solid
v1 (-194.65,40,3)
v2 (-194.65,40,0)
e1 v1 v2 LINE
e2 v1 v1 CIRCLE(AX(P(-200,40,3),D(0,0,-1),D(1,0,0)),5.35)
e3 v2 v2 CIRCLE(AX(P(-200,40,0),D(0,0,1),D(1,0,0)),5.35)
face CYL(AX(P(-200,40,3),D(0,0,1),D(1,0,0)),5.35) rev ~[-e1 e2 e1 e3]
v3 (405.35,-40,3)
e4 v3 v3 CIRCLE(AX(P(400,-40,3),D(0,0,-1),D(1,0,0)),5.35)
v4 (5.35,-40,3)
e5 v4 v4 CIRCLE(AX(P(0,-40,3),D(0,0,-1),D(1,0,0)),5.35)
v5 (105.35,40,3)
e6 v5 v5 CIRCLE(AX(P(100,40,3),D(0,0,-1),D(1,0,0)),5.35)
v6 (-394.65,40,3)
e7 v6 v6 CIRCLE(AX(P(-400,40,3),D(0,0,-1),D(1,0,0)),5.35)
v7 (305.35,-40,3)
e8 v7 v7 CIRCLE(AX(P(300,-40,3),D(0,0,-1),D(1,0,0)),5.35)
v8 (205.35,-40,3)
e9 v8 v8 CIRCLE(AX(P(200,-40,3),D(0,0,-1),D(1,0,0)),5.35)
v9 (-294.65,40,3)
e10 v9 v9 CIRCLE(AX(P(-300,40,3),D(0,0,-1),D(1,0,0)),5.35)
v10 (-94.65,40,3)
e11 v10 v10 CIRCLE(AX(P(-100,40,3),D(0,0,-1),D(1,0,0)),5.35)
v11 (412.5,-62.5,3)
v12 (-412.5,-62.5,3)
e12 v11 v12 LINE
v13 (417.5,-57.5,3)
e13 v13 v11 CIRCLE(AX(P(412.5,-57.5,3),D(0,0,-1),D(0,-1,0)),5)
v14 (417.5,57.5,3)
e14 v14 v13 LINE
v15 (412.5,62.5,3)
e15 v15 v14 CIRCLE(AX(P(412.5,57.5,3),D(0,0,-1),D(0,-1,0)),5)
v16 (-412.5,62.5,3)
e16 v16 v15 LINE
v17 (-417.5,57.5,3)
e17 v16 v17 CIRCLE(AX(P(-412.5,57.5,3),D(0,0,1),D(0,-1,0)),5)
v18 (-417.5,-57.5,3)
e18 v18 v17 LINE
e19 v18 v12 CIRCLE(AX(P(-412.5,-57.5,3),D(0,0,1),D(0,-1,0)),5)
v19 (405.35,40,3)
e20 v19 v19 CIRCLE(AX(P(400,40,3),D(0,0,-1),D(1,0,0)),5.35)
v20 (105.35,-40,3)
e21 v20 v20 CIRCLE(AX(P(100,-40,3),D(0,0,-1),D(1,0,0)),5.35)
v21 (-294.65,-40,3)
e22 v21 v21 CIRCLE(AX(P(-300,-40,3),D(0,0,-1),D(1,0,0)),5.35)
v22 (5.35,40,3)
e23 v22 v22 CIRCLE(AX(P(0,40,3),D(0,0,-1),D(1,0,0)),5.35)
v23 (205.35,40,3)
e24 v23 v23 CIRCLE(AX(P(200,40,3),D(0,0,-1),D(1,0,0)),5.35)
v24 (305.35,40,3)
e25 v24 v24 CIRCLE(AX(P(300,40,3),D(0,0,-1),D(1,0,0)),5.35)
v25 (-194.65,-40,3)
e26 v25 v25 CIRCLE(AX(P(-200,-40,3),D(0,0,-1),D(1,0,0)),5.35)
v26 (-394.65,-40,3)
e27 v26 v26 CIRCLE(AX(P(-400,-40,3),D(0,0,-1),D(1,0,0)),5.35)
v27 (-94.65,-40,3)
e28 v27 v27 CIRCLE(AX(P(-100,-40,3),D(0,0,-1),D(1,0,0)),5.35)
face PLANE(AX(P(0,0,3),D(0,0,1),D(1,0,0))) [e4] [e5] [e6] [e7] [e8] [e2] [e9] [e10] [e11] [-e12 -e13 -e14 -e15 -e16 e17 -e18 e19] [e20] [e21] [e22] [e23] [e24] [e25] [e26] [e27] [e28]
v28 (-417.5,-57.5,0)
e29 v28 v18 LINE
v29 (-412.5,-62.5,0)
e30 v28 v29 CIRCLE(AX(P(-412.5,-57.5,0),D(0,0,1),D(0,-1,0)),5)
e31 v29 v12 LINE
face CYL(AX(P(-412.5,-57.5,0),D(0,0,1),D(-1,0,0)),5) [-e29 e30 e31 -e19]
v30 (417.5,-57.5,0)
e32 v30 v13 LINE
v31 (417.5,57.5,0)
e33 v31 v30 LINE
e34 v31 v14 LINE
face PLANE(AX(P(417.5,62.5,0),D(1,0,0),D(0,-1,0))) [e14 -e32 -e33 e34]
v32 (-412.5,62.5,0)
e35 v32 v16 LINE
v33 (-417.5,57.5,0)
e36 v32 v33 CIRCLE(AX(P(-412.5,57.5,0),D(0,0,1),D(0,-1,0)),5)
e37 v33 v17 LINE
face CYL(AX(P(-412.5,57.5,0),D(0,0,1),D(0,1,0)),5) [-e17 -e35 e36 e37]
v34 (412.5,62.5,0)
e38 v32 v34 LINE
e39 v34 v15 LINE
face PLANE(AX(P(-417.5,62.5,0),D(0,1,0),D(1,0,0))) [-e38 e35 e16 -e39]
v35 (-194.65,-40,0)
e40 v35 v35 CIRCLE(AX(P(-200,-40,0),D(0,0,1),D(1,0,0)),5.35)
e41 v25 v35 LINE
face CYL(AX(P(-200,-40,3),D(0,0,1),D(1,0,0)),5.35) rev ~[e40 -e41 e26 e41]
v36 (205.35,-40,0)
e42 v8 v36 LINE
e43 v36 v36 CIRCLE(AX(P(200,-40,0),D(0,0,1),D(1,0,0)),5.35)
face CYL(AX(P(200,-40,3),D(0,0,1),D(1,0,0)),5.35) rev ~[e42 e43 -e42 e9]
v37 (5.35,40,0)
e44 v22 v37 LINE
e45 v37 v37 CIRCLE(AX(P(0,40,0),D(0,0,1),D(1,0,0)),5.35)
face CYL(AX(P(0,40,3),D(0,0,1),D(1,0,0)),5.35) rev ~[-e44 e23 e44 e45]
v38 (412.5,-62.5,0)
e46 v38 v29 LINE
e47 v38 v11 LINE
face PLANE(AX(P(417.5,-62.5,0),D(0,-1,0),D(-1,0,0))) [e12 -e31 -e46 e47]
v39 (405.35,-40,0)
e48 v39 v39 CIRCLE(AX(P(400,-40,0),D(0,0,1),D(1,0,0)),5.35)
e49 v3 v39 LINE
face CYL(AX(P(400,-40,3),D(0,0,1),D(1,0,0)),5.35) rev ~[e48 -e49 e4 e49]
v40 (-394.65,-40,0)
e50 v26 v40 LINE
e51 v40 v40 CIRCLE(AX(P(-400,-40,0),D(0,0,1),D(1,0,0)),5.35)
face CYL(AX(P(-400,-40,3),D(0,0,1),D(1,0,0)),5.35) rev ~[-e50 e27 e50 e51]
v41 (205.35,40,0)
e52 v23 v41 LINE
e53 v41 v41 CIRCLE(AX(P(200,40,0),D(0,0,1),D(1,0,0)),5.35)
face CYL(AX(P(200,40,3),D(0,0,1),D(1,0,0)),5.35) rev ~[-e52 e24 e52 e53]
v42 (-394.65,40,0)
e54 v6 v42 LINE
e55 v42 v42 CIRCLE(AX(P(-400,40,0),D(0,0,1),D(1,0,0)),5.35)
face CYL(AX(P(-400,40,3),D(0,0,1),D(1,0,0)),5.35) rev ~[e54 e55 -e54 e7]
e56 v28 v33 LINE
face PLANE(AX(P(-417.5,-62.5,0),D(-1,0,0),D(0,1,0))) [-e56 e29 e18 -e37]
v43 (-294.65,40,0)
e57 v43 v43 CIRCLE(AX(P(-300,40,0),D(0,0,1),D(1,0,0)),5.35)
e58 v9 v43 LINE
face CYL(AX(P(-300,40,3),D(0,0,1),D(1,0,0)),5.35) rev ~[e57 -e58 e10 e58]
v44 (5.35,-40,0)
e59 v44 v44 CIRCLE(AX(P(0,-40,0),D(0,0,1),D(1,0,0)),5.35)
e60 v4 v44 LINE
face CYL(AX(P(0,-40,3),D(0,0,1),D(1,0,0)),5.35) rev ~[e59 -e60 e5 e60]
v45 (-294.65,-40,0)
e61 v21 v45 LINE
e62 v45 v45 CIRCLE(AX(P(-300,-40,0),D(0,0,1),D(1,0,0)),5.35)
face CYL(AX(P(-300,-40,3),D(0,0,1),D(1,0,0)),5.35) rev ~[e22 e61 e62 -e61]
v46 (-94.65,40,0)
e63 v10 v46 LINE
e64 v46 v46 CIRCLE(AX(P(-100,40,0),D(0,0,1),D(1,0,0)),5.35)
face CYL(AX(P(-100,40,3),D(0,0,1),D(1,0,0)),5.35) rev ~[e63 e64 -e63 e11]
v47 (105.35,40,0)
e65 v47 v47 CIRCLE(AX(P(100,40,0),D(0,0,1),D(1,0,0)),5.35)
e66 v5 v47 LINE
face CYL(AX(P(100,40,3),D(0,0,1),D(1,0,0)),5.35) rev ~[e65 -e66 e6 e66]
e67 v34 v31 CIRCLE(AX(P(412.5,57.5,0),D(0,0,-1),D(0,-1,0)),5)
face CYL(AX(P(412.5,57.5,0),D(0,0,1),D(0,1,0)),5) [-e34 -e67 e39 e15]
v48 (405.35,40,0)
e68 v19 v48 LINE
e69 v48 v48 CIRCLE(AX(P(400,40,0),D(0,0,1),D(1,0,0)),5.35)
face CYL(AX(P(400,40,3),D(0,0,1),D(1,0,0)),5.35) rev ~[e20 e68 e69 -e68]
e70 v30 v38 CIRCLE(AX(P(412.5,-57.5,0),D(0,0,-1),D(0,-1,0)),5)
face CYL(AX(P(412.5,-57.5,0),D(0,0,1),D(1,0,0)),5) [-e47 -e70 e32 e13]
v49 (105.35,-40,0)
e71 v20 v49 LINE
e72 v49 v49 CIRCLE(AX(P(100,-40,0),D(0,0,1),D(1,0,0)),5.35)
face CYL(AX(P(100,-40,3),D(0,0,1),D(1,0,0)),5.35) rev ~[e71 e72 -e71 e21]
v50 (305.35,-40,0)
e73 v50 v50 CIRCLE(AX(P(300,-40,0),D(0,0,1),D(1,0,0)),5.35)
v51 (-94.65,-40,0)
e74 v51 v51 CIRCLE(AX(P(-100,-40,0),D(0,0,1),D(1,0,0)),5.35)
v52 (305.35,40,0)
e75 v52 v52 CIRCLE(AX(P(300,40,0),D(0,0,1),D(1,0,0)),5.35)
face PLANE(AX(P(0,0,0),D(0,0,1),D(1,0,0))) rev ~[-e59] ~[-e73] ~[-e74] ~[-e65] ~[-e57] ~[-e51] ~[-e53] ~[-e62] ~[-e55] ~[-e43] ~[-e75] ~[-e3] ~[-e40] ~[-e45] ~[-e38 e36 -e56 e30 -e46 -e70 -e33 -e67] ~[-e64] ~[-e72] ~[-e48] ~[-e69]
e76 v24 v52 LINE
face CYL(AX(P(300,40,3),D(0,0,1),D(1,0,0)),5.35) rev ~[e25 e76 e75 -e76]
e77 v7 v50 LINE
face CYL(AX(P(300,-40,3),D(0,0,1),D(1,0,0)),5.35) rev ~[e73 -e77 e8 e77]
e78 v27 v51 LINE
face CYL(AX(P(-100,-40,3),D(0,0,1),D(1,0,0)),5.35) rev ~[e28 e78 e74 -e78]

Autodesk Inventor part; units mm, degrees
ref_plane "YZ Plane" through (0, 0, 0) normal (1, 0, 0) x (0, 1, 0)
ref_plane "XZ Plane" through (0, 0, 0) normal (0, 1, 0) x (-1, 0, 0)
ref_plane "XY Plane" through (0, 0, 0) normal (0, 0, 1) x (1, 0, 0)
sketch "Sketch1" plane through (0, 0, 0) normal (0, 0, 1) x (1, 0, 0)
  line L0 (-417.5, 62.5) -> (417.5, 62.5)
  line L1 (417.5, 62.5) -> (417.5, -62.5)
  line L2 (417.5, -62.5) -> (-417.5, -62.5)
  line L3 (-417.5, -62.5) -> (-417.5, 62.5)
  line L4 (-417.5, 62.5) -> (417.5, -62.5) construction
  line L5 (417.5, 62.5) -> (-417.5, -62.5) construction
  point P0 (0, 0)
  dimension "d0" = 125
  dimension "d1" = 835
extrude "Plate1" add sketch "Sketch1" along normal blind 3
sketch "Sketch2" plane through (0, 0, 3) normal (0, 0, 1) x (1, 0, 0)
  circle A0 centre (0, 40) radius 5.35
  circle A1 centre (0, -40) radius 5.35
  line L0 (0, 40) -> (0, -40)
  point P0 (0, 0)
  point P1 (0, 0)
  dimension "d3" = 10.7
  dimension "d4" = 80
extrude "Cut1" cut sketch "Sketch2" against normal blind 3
pattern_linear "Rectangular Pattern1" count 9 spacing 100 along (1, 0, 0) of "Cut1" first direction both ways yes
fillet "Fillet1" radius 5 4 edges at (417.5, -62.5, 1.5) (417.5, 62.5, 1.5) (-417.5, -62.5, 1.5) (-417.5, 62.5, 1.5)
equation "\"d5\" = Thickness"
equation "\"d2\" = Thickness"
equation "\"BendRadius\" = Thickness"
equation "\"BendReliefWidth\" = Thickness"
equation "\"BendReliefDepth\" = 0.5 * Thickness"
equation "\"CornerReliefSize\" = 4 * Thickness"
equation "\"MinimumRemnant\" = 2 * Thickness"
equation "\"TransitionRadius\" = BendRadius"
equation "\"JacobiRadiusSize\" = BendRadius"
equation "\"GapSize\" = Thickness"
equation "\"Thickness\" = 3"
properties part number "IMS-10-002" material "Steel, Carbon"
